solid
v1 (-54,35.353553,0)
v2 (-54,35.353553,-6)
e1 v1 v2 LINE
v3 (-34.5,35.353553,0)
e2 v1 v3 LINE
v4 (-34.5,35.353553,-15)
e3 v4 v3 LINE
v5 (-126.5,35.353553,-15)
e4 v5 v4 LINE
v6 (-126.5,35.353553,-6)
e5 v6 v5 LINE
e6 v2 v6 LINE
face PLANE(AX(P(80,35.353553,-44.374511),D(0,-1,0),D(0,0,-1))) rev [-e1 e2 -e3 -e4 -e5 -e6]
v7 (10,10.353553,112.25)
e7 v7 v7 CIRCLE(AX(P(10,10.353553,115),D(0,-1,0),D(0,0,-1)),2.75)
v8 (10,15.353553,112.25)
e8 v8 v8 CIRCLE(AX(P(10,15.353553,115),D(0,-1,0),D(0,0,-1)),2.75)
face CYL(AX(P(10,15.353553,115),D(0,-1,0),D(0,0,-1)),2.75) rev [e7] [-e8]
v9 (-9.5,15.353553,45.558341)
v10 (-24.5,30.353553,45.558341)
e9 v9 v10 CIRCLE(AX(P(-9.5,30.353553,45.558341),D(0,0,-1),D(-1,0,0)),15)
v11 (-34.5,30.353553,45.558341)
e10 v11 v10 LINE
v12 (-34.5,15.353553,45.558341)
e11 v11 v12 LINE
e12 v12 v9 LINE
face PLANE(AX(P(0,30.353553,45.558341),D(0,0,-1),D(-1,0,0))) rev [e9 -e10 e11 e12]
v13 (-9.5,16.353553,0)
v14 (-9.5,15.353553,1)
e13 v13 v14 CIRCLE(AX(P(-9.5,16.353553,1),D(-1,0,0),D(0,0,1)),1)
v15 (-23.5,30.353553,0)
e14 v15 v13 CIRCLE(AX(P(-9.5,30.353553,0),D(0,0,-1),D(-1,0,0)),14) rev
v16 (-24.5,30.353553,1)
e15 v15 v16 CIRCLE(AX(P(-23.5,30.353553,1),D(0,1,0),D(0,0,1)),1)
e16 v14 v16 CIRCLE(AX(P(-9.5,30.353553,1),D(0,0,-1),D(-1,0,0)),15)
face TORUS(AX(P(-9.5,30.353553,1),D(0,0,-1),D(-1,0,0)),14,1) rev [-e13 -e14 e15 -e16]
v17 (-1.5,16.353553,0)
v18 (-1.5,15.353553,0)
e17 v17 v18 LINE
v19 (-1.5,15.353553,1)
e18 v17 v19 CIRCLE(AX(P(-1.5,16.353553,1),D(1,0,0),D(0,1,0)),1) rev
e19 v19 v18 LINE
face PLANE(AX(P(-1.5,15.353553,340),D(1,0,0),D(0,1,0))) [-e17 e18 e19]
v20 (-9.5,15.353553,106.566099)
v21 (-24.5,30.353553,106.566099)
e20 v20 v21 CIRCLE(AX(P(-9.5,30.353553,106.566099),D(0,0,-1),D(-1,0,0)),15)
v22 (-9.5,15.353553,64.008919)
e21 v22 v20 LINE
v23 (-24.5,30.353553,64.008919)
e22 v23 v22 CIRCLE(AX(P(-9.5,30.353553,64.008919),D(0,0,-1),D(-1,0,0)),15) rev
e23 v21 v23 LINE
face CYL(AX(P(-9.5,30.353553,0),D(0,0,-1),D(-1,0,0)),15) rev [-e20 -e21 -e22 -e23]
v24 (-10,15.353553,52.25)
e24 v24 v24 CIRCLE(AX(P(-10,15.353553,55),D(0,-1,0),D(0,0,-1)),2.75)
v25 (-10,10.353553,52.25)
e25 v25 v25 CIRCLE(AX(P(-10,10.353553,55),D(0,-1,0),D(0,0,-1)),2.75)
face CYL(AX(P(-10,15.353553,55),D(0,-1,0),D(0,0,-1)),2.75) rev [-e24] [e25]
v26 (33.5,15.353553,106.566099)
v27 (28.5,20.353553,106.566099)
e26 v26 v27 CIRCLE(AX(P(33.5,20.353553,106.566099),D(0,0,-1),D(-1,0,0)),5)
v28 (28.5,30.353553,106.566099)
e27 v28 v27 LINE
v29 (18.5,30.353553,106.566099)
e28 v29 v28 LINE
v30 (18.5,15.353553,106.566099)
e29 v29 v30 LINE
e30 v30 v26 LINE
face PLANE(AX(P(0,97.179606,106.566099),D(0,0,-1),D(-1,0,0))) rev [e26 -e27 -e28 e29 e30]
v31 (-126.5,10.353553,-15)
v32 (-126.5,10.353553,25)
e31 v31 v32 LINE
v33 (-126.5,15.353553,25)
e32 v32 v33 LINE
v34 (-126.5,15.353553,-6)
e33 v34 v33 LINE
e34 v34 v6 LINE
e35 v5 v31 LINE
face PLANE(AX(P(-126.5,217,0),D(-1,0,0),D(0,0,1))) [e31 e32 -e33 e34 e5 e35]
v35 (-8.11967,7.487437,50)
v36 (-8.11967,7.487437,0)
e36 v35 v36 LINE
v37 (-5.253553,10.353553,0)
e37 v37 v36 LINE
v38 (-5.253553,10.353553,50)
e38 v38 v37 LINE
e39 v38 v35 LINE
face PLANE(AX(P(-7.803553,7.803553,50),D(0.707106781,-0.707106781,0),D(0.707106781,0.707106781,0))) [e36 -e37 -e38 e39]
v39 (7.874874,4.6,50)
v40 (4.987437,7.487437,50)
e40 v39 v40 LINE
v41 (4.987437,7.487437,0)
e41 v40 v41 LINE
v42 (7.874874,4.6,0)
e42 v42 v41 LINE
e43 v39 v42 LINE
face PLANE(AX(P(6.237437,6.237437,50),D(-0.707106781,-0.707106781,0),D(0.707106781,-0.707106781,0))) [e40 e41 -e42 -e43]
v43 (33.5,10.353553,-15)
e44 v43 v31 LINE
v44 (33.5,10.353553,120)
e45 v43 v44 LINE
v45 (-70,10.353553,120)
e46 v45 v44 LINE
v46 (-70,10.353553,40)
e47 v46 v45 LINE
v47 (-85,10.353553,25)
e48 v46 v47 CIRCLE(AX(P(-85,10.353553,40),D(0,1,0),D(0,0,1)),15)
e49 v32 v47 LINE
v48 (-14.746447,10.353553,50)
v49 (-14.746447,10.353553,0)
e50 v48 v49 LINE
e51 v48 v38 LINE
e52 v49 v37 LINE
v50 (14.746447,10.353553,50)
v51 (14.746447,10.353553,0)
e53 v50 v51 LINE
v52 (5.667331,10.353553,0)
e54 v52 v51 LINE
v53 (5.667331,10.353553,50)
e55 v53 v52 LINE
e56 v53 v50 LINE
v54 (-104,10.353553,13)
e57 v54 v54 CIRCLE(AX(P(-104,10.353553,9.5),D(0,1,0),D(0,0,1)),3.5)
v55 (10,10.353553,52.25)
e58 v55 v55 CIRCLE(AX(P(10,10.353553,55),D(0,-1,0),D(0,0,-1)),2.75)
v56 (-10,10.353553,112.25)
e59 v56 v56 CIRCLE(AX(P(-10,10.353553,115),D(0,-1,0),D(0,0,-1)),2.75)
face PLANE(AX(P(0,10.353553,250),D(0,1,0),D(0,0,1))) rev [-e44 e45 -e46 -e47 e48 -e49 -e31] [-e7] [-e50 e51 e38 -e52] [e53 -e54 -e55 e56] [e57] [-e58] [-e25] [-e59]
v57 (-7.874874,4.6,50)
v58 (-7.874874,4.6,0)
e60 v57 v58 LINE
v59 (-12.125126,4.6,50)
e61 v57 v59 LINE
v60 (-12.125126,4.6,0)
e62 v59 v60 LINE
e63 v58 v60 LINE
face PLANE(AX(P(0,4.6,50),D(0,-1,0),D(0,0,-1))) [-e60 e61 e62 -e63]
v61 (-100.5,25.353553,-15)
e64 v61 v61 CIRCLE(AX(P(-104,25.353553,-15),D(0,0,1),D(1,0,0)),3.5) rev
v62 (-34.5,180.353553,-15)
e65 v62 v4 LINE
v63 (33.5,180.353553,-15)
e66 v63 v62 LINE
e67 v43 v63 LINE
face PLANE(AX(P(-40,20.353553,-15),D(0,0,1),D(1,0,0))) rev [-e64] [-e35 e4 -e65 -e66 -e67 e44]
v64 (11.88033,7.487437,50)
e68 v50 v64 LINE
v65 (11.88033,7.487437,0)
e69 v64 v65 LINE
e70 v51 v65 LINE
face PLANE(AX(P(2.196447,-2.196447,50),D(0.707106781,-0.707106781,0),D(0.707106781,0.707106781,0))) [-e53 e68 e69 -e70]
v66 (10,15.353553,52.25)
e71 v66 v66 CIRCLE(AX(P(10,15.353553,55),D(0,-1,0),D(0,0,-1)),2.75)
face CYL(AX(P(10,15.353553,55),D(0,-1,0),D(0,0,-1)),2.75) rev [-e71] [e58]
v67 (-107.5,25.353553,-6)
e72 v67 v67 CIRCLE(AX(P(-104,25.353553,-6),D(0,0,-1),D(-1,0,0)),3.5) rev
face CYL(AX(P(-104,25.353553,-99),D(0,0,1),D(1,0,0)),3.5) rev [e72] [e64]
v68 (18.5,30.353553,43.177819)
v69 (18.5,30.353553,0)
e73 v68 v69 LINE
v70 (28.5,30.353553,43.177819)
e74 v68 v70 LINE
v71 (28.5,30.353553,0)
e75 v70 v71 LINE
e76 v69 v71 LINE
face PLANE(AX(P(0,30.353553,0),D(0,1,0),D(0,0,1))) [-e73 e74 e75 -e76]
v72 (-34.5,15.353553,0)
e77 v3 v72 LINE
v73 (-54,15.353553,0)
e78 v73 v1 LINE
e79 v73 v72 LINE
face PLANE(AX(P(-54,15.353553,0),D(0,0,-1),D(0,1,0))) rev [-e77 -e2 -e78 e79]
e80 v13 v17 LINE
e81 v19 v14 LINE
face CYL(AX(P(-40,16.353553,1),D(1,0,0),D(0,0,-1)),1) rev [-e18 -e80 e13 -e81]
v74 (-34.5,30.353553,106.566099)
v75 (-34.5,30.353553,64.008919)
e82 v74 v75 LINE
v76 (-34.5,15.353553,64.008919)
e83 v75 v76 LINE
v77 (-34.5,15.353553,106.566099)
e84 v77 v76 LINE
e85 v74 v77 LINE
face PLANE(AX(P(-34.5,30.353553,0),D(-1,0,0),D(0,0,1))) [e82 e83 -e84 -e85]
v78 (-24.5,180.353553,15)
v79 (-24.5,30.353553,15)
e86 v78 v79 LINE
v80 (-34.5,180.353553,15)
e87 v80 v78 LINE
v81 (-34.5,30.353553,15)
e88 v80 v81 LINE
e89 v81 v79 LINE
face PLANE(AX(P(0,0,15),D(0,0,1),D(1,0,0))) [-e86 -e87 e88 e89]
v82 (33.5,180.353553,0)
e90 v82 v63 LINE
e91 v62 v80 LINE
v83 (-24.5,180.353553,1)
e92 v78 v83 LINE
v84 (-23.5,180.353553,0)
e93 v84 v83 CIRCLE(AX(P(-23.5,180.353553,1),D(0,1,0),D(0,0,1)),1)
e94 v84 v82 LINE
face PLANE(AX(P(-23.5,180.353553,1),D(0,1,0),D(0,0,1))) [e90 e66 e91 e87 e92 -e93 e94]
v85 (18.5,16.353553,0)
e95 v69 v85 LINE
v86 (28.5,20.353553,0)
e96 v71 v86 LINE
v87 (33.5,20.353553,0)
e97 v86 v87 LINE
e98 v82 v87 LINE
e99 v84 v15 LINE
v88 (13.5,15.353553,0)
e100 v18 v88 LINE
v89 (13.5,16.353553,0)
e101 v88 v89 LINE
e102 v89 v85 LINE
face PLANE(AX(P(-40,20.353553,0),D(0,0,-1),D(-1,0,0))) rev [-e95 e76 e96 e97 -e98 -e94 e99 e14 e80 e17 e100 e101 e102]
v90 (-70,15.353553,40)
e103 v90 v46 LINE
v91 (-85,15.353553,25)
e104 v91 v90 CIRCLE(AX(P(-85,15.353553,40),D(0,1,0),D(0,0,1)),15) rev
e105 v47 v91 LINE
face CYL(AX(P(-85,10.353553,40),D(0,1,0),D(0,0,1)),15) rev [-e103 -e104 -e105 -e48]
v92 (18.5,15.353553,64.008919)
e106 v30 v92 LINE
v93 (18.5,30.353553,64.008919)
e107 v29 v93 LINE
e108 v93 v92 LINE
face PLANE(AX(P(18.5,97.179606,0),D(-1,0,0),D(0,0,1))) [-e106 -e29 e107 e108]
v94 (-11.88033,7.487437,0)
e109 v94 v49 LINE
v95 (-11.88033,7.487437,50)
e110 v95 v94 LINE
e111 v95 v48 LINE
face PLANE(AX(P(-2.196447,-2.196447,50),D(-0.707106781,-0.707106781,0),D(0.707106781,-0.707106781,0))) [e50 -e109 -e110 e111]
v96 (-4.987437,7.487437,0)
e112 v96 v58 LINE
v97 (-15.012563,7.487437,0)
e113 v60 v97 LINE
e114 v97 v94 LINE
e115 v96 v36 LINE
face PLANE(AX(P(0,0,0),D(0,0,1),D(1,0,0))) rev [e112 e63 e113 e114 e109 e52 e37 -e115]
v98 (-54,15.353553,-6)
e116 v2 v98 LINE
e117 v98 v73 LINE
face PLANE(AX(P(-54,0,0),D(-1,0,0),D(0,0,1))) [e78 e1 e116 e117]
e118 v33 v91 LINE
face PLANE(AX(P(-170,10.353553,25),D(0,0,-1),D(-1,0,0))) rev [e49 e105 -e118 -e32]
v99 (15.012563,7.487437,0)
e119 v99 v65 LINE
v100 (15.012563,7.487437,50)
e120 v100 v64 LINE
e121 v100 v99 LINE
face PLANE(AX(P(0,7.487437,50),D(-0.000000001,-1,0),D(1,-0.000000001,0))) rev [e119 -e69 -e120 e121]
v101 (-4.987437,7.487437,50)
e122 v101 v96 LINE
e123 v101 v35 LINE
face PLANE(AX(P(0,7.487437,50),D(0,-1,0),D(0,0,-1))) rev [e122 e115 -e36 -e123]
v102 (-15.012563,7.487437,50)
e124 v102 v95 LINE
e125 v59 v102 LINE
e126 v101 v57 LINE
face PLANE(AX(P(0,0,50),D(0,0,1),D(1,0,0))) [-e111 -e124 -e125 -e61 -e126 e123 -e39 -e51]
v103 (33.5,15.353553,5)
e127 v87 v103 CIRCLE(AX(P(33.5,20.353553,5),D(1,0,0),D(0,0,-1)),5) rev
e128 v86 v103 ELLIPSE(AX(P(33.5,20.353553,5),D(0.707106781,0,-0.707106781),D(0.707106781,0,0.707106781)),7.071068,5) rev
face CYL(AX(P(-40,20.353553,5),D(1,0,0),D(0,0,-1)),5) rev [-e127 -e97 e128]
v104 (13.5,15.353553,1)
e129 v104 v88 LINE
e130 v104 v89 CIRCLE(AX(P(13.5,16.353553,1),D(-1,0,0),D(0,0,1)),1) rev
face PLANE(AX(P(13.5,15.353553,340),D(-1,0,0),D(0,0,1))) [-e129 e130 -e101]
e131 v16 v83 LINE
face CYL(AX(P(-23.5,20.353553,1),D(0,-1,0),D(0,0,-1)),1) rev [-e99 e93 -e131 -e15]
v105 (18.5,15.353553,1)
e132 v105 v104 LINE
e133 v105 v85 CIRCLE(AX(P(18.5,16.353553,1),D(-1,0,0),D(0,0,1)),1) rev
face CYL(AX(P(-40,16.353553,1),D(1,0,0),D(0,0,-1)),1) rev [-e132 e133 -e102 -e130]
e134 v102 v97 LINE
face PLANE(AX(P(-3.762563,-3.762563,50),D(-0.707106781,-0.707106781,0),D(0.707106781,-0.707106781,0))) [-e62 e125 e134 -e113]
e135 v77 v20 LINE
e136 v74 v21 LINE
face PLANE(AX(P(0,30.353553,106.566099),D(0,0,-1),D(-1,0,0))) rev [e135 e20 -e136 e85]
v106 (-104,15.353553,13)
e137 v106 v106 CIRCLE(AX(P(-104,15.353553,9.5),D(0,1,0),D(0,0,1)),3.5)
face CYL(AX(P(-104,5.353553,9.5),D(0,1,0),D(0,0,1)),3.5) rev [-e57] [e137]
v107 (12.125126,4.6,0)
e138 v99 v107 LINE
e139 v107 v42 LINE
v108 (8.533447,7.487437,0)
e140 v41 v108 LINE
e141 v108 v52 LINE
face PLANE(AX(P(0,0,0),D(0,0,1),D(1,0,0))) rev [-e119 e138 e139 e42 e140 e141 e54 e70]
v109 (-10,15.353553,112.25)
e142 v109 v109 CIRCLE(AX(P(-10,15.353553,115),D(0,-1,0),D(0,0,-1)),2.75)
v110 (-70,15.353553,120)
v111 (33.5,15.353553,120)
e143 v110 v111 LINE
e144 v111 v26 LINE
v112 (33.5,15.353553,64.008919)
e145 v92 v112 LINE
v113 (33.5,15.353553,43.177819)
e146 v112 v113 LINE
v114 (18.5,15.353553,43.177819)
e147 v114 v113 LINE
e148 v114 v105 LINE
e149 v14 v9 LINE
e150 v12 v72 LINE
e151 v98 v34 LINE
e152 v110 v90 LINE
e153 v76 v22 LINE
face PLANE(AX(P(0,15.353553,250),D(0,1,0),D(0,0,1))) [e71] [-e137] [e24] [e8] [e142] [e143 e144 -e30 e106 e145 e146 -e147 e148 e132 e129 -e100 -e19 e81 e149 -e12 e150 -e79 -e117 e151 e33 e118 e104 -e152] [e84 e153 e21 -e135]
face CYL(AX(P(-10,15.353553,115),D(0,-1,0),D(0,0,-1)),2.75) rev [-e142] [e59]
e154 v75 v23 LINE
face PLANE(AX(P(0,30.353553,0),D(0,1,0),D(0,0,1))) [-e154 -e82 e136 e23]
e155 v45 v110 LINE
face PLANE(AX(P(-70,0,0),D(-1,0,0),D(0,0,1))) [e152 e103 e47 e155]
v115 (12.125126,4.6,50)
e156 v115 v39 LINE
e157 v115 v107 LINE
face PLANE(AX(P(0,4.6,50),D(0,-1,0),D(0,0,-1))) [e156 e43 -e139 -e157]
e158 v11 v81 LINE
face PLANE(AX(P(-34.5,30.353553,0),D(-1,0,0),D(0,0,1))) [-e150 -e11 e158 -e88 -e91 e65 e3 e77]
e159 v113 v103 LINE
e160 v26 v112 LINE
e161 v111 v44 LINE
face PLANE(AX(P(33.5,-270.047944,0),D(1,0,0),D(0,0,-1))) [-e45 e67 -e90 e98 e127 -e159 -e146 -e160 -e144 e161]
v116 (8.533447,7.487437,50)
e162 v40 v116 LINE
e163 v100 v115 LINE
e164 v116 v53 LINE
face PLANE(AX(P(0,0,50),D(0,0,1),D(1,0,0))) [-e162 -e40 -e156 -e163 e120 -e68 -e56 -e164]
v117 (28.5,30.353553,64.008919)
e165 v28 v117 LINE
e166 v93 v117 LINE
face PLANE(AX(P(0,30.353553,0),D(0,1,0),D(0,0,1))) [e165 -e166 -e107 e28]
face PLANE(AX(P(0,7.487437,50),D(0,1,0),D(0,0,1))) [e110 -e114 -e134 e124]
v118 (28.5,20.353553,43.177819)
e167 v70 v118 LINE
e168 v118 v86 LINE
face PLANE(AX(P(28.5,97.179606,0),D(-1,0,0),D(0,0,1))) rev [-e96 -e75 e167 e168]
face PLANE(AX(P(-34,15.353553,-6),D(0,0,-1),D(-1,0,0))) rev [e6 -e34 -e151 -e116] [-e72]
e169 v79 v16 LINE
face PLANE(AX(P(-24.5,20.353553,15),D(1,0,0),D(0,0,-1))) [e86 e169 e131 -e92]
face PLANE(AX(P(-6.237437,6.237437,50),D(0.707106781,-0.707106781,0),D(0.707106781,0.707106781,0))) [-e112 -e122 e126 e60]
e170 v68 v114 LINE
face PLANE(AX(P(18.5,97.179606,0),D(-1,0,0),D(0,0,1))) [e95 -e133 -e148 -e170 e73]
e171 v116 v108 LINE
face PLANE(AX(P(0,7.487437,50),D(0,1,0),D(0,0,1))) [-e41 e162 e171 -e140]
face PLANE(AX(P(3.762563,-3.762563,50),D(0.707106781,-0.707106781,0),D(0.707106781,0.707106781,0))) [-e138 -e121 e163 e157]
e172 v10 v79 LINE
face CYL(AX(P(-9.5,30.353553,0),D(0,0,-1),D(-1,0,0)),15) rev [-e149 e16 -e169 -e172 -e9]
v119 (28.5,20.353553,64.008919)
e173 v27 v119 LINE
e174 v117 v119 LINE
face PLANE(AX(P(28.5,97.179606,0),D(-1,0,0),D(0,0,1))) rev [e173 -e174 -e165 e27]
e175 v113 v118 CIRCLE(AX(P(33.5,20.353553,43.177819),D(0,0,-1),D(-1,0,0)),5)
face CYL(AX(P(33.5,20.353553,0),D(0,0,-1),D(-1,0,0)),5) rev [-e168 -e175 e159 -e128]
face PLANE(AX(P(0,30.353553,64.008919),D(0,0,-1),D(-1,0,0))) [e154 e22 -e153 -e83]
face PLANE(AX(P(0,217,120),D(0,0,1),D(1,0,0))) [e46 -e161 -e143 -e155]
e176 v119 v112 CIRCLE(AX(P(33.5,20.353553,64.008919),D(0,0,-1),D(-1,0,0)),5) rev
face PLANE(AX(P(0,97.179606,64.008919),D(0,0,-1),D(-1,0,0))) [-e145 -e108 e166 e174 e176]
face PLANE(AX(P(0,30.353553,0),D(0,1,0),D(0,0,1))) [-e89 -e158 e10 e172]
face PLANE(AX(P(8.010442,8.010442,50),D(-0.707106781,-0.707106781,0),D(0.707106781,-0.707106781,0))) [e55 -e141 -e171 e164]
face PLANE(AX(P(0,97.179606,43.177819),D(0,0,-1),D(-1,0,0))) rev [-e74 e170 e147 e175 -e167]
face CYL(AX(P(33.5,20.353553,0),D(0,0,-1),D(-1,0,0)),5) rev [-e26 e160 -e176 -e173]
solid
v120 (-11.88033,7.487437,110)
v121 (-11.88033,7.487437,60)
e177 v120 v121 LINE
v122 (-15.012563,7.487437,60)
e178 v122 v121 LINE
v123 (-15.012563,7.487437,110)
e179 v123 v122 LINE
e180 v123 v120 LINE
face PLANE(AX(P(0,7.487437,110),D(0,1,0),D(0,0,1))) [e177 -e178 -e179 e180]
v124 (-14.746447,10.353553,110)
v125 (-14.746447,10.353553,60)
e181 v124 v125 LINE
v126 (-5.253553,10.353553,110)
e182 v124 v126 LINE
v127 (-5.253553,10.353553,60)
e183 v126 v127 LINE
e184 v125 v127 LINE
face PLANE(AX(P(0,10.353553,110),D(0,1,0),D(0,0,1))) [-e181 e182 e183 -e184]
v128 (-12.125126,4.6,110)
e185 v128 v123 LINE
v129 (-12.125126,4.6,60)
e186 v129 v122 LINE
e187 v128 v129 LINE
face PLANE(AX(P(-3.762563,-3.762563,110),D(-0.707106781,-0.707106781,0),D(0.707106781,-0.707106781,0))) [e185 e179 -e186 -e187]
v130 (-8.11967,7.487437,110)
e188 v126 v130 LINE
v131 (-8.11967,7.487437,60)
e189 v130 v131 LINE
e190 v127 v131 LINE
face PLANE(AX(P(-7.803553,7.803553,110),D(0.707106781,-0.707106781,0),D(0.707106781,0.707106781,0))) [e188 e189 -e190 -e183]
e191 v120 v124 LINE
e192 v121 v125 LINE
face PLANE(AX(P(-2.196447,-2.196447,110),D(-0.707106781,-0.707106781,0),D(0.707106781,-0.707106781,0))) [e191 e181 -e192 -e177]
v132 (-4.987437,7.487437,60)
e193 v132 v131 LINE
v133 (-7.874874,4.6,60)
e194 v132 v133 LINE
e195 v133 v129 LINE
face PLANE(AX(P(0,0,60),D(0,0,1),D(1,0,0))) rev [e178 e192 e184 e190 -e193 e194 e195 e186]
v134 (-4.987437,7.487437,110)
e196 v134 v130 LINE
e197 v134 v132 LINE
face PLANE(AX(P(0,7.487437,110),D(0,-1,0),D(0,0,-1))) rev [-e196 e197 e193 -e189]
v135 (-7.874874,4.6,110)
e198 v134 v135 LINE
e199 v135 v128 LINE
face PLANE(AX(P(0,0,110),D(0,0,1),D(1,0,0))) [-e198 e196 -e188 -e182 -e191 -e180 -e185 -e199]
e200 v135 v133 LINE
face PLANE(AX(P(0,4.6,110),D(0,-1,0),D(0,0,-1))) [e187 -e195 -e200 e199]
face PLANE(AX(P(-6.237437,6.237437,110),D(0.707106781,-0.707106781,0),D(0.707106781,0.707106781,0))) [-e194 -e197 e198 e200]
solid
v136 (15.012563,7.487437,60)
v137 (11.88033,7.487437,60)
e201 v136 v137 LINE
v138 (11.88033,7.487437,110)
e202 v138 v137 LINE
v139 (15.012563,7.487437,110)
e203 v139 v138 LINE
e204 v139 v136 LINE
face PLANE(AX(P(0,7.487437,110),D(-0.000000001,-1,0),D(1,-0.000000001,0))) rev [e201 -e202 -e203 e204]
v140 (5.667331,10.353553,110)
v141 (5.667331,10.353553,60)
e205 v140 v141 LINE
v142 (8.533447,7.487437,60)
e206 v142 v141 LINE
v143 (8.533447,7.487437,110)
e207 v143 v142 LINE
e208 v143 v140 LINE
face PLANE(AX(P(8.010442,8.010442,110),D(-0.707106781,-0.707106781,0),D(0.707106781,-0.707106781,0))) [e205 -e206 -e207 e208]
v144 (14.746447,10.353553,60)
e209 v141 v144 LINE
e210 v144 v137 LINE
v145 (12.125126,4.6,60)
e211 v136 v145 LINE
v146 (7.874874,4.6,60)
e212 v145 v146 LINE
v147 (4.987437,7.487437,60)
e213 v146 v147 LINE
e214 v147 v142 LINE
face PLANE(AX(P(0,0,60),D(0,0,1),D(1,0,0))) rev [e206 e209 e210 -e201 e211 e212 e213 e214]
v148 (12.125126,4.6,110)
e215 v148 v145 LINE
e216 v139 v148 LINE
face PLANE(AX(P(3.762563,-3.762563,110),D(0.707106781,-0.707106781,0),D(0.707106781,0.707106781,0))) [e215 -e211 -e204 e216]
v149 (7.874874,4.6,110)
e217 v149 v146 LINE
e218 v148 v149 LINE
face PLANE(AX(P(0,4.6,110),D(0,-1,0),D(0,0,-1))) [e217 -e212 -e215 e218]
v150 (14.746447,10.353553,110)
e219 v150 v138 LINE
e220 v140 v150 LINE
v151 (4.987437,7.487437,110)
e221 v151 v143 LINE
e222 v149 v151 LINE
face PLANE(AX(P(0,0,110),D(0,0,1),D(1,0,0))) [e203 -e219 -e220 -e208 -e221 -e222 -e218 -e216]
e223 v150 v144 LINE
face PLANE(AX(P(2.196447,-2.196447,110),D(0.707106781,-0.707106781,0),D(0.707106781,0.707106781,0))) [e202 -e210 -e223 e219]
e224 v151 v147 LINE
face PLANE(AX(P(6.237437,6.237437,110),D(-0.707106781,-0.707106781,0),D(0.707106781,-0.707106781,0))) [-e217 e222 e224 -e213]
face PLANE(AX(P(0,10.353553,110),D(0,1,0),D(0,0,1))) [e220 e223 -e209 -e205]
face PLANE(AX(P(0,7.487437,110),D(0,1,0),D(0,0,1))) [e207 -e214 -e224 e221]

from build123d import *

# Parameters (mm, degrees)
BOSS_EXTRUDE1_DEPTH      = 250
BOSS_EXTRUDE2_DEPTH      = 50
BOSS_EXTRUDE2_2_DEPTH    = 50
LPATTERN1_COUNT          = 4
LPATTERN1_PITCH          = 60
SKETCH2_R                = 2.75
CUT_EXTRUDE1_DEPTH       = 251.864711302
UPPER_ACRYLIC_SUPP_W     = 20
UPPER_ACRYLIC_SUPP_H     = 250
BOSS_EXTRUDE3_DEPTH      = 5
UPPER_ACRYLIC_SUPP_3_W   = 10
UPPER_ACRYLIC_SUPP_3_H   = 66.073604859
UPPER_ACRYLIC_SUPP_3_H_2 = 41.475217291
UPPER_ACRYLIC_SUPP_3_H_3 = 42.557179481
UPPER_ACRYLIC_SUPP_3_H_4 = 45.558340935
BOSS_EXTRUDE4_DEPTH      = 15
FILLET1_R                = 15
SKETCH4_W                = 60
SKETCH4_H                = 15
BOSS_EXTRUDE5_DEPTH      = 5
SKETCH4_3_W              = 60
SKETCH4_3_H              = 15
BOSS_EXTRUDE6_DEPTH      = 60
SKETCH5_W                = 10
SKETCH5_H                = 45
BOSS_EXTRUDE7_DEPTH      = 15
BOSS_EXTRUDE8_START      = 250
SKETCH5_3_W              = 10
SKETCH5_3_H              = 45
BOSS_EXTRUDE8_DEPTH      = 15
FILLET2_R                = 1
SKETCH6_W                = 6
SKETCH6_H                = 60
CUT_EXTRUDE2_DEPTH       = 6
BOSS_EXTRUDE9_DEPTH      = 30
SKETCH8_W                = 333.602701612
SKETCH8_H                = 59.031331047
CUT_EXTRUDE3_DEPTH       = 150
SKETCH9_W                = 6
SKETCH9_H                = 20
CLOTH_ESCAPE_GAP_DEPTH   = 20
SKETCH11_W               = 9
SKETCH11_H               = 20
BOSS_EXTRUDE11_DEPTH     = 100
CUT_EXTRUDE4_DEPTH       = 68
SKETCH13_W               = 40
SKETCH13_H               = 5
BOSS_EXTRUDE13_DEPTH     = 100
CUT_EXTRUDE5_DEPTH       = 100
FILLET3_R                = 15
BOSS_EXTRUDE14_START     = -5
BOSS_EXTRUDE14_DEPTH     = 25
CUT_EXTRUDE6_DEPTH       = 30
CUT_EXTRUDE6_DEPTH_BACK  = 10
SKETCH16_5_W             = 8.5
SKETCH16_5_H             = 41.475217291
SKETCH16_5_H_2           = 42.557179481
SKETCH16_5_W_2           = 1.5
SKETCH16_5_H_3           = 42.177819043
SKETCH16_5_H_4           = 20.831100018
SKETCH16_5_H_5           = 17.311395043
SKETCH16_5_H_6           = 18.573684265
SKETCH16_5_H_7           = 65.073604859
SKETCH16_6_W             = 8.5
SKETCH16_6_H             = 41.475217291
SKETCH16_6_H_2           = 42.557179481
SKETCH16_6_W_2           = 1.5
SKETCH16_6_H_3           = 42.177819043
SKETCH16_6_H_4           = 20.831100018
SKETCH16_6_H_5           = 17.311395043
SKETCH16_6_H_6           = 18.573684265
SKETCH16_6_H_7           = 65.073604859
BOSS_EXTRUDE15_DEPTH     = 5
BOSS_EXTRUDE16_DEPTH     = 20
SKETCH16_8_W             = 8.5
SKETCH16_8_H             = 41.475217291
SKETCH16_8_H_2           = 42.557179481
SKETCH16_8_W_2           = 1.5
SKETCH16_8_H_3           = 42.177819043
SKETCH16_8_H_4           = 65.073604859
BOSS_EXTRUDE17_DEPTH     = 15
BOSS_EXTRUDE18_START     = -5
BOSS_EXTRUDE18_DEPTH     = 25
FILLET4_R                = 5
BOSS_EXTRUDE21_START     = 145
BOSS_EXTRUDE21_DEPTH     = 170
SKETCH19_R               = 3.5
CUT_EXTRUDE7_DEPTH       = 10
CUT_EXTRUDE8_DEPTH       = 355
CUT_EXTRUDE8_DEPTH_BACK  = 10
SKETCH20_R               = 3.5
SKETCH21_W               = 15
SKETCH21_H               = 197.501027769
CUT_EXTRUDE9_DEPTH       = 340
SKETCH22_W               = 160
SKETCH22_H               = 135
SKETCH22_H_2             = 10
CUT_EXTRUDE10_DEPTH      = 217


with BuildPart() as part:
    # profile → Boss-Extrude1 (new body)
    with BuildSketch(Plane.XY):
        Polygon((-14.746446609, 10.353553391), (-5.253553391, 10.353553391), (5.667330529, 10.353553391), (14.746446609, 10.353553391), (20, 10.353553391), (20, 15.353553391), (-20, 15.353553391), (-20, 10.353553391), align=None)
    extrude(amount=BOSS_EXTRUDE1_DEPTH)

    # Sketch2 → Cut-Extrude1 (cut, through all)
    with BuildSketch(Plane.XZ.offset(-10.353553391)):
        with Locations(Location((-10, 175, 0), (0, 0, 270))):
            Circle(SKETCH2_R)
        with Locations(Location((10, 175, 0), (0, 0, 270))):
            Circle(SKETCH2_R)
        with Locations(Location((-10, 115, 0), (0, 0, 270))):
            Circle(SKETCH2_R)
        with Locations(Location((10, 115, 0), (0, 0, 270))):
            Circle(SKETCH2_R)
        with Locations(Location((-10, 55, 0), (0, 0, 270))):
            Circle(SKETCH2_R)
        with Locations(Location((10, 55, 0), (0, 0, 270))):
            Circle(SKETCH2_R)
    extrude(amount=-CUT_EXTRUDE1_DEPTH, mode=Mode.SUBTRACT)

    # upper_acrylic_supp → Boss-Extrude3 (add)
    with BuildSketch(Plane(origin=(0, 15.353553391, 0), x_dir=(1, 0, 0), z_dir=(0, 1, 0))):
        with Locations((-30, -125)):
            Rectangle(UPPER_ACRYLIC_SUPP_W, UPPER_ACRYLIC_SUPP_H)
    extrude(amount=-BOSS_EXTRUDE3_DEPTH)

    # upper_acrylic_supp<3> → Boss-Extrude4 (add)
    with BuildSketch(Plane(origin=(0, 15.353553391, 0), x_dir=(1, 0, 0), z_dir=(0, 1, 0))):
        with Locations((-29.5, -216.963197571)):
            Rectangle(UPPER_ACRYLIC_SUPP_3_W, UPPER_ACRYLIC_SUPP_3_H)
        with Locations((-29.5, -144.615102231)):
            Rectangle(UPPER_ACRYLIC_SUPP_3_W, UPPER_ACRYLIC_SUPP_3_H_2)
        with Locations((-29.5, -85.287508801)):
            Rectangle(UPPER_ACRYLIC_SUPP_3_W, UPPER_ACRYLIC_SUPP_3_H_3)
        with Locations((-29.5, -22.779170468)):
            Rectangle(UPPER_ACRYLIC_SUPP_3_W, UPPER_ACRYLIC_SUPP_3_H_4)
    extrude(amount=BOSS_EXTRUDE4_DEPTH)

    # Fillet1
    fillet1_edges = [part.edges().sort_by_distance(p)[0] for p in [
        (-24.5, 15.353553391, 22.779170467),
        (-24.5, 15.353553391, 85.287508801),
        (-24.5, 15.353553391, 144.615102231),
        (-24.5, 15.353553391, 216.963197571),
    ]]
    fillet(fillet1_edges, radius=FILLET1_R - 0.0001)  # a hair under: the kernel refuses the full size



with BuildPart() as body_2:
    # Sketch1<3> → Boss-Extrude2 (new body)
    with BuildSketch(Plane.XY):
        Polygon((-7.253553391, 8.353553391), (-8.119669914, 7.487436867), (-5.5, 7.487436867), (-4.987436867, 7.487436867), (-5.5, 6.974873734), (-7.874873734, 4.6), (-12.125126266, 4.6), (-14.5, 6.974873734), (-15.012563133, 7.487436867), (-14.5, 7.487436867), (-11.880330086, 7.487436867), (-12.746446609, 8.353553391), (-14.746446609, 10.353553391), (-5.253553391, 10.353553391), align=None)
    boss_extrude2 = extrude(amount=BOSS_EXTRUDE2_DEPTH)


with BuildPart() as body_3:
    # Sketch1<3> → Boss-Extrude2 2 (new body)
    with BuildSketch(Plane.XY):
        Polygon((12.746446609, 8.353553391), (11.880330086, 7.487436867), (14.5, 7.487436867), (15.012563133, 7.487436867), (14.5, 6.974873734), (12.125126266, 4.6), (7.874873734, 4.6), (5.5, 6.974873734), (4.987436867, 7.487436867), (5.5, 7.487436867), (8.533447053, 7.487436867), (7.667330529, 8.353553391), (5.667330529, 10.353553391), (14.746446609, 10.353553391), align=None)
    boss_extrude2_2 = extrude(amount=BOSS_EXTRUDE2_2_DEPTH)


with BuildPart() as lpattern1_1:
    # LPattern1: pattern copy
    add(boss_extrude2.moved(Location(Vector(0, 0, 1) * (1 * LPATTERN1_PITCH))))


with BuildPart() as lpattern1_2:
    # LPattern1: pattern copy
    add(boss_extrude2.moved(Location(Vector(0, 0, 1) * (2 * LPATTERN1_PITCH))))


with BuildPart() as lpattern1_3:
    # LPattern1: pattern copy
    add(boss_extrude2.moved(Location(Vector(0, 0, 1) * (3 * LPATTERN1_PITCH))))


with BuildPart() as lpattern1_4:
    # LPattern1: pattern copy
    add(boss_extrude2_2.moved(Location(Vector(0, 0, 1) * (1 * LPATTERN1_PITCH))))


with BuildPart() as lpattern1_5:
    # LPattern1: pattern copy
    add(boss_extrude2_2.moved(Location(Vector(0, 0, 1) * (2 * LPATTERN1_PITCH))))


with BuildPart() as lpattern1_6:
    # LPattern1: pattern copy
    add(boss_extrude2_2.moved(Location(Vector(0, 0, 1) * (3 * LPATTERN1_PITCH))))


with BuildPart() as part_1:
    add(part.part)

    add(body_2.part)  # Boss-Extrude5 merges body 2

    add(body_3.part)  # Boss-Extrude5 merges body 3
    # Sketch4 → Boss-Extrude5 (add, symmetric)
    with BuildSketch(Plane(origin=(0, 15.353553391, 0), x_dir=(1, 0, 0), z_dir=(0, 1, 0))):
        with Locations((-10, -257.5)):
            Rectangle(SKETCH4_W, SKETCH4_H)
        with Locations((-10, 7.5)):
            Rectangle(SKETCH4_W, SKETCH4_H)
    extrude(amount=BOSS_EXTRUDE5_DEPTH, both=True)

    # Sketch4<3> → Boss-Extrude6 (add)
    with BuildSketch(Plane(origin=(0, 15.353553391, 0), x_dir=(1, 0, 0), z_dir=(0, 1, 0))):
        with Locations((-10, -257.5)):
            Rectangle(SKETCH4_3_W, SKETCH4_3_H)
        with Locations((-10, 7.5)):
            Rectangle(SKETCH4_3_W, SKETCH4_3_H)
    extrude(amount=BOSS_EXTRUDE6_DEPTH)

    # Sketch5 → Boss-Extrude7 (add)
    with BuildSketch(Plane(origin=(0, 0, 250), x_dir=(-1, 0, 0), z_dir=(0, 0, -1))):
        with Locations((29.5, 52.853553391)):
            Rectangle(SKETCH5_W, SKETCH5_H)
    extrude(amount=BOSS_EXTRUDE7_DEPTH)

    # Sketch5<3> → Boss-Extrude8 (add)
    with BuildSketch(Plane(origin=(0, 0, 250), x_dir=(-1, 0, 0), z_dir=(0, 0, -1)).offset(BOSS_EXTRUDE8_START)):
        with Locations((29.5, 52.853553391)):
            Rectangle(SKETCH5_3_W, SKETCH5_3_H)
    extrude(amount=-BOSS_EXTRUDE8_DEPTH)

    # Fillet2
    fillet2_edges = [part_1.edges().sort_by_distance(p)[0] for p in [
        (-24.5, 52.853503391, 250),
        (-24.5, 52.853503391, 0),
        (5.24995, 15.353553391, 250),
        (-20.106631007, 19.746922384, 250),
        (-20.106631007, 19.746922384, 0),
        (5.24995, 15.353553391, 0),
    ]]
    fillet(fillet2_edges, radius=FILLET2_R)

    # Sketch6 → Cut-Extrude2 (cut)
    with BuildSketch(Plane.ZY.offset(40)):
        with Locations((253, 45.353553391)):
            Rectangle(SKETCH6_W, SKETCH6_H)
        with Locations((-3, 45.353553391)):
            Rectangle(SKETCH6_W, SKETCH6_H)
    extrude(amount=-CUT_EXTRUDE2_DEPTH, mode=Mode.SUBTRACT)

    # Sketch7 → Boss-Extrude9 (add)
    with BuildSketch(Plane.ZY.offset(40)):
        Polygon((265, 75.353553391), (256, 75.353553391), (256, 15.353553391), (-6, 15.353553391), (-6, 75.353553391), (-15, 75.353553391), (-15, 10.353553391), (265, 10.353553391), align=None)
    extrude(amount=BOSS_EXTRUDE9_DEPTH)

    # Sketch8 → Cut-Extrude3 (cut)
    with BuildSketch(Plane.ZY.offset(70)):
        with Locations((122.426839416, 64.869218915)):
            Rectangle(SKETCH8_W, SKETCH8_H)
    extrude(amount=-CUT_EXTRUDE3_DEPTH, mode=Mode.SUBTRACT)

    # Sketch9 → cloth_escape_gap (add)
    with BuildSketch(Plane.ZY.offset(34)):
        with Locations((253, 25.353553391)):
            Rectangle(SKETCH9_W, SKETCH9_H)
        with Locations((-3, 25.353553391)):
            Rectangle(SKETCH9_W, SKETCH9_H)
    extrude(amount=CLOTH_ESCAPE_GAP_DEPTH)

    # Sketch11 → Boss-Extrude11 (add)
    with BuildSketch(Plane.ZY.offset(70)):
        with Locations((-10.5, 25.353553391)):
            Rectangle(SKETCH11_W, SKETCH11_H)
        with Locations((260.5, 25.353553391)):
            Rectangle(SKETCH11_W, SKETCH11_H)
    extrude(amount=BOSS_EXTRUDE11_DEPTH)

    # Sketch12 → Cut-Extrude4 (cut)
    with BuildSketch(Plane.XZ.offset(-10.353553391)):
        Polygon((-170, 265), (-70, 265), (-170, 260.5), align=None)
        Polygon((-70, -15), (-170, -10.5), (-170, -15), align=None)
    extrude(amount=-CUT_EXTRUDE4_DEPTH, mode=Mode.SUBTRACT)

    # Sketch13 → Boss-Extrude13 (add)
    with BuildSketch(Plane.ZY.offset(70)):
        with Locations((5, 12.853553391)):
            Rectangle(SKETCH13_W, SKETCH13_H)
        with Locations((245, 12.853553391)):
            Rectangle(SKETCH13_W, SKETCH13_H)
    extrude(amount=BOSS_EXTRUDE13_DEPTH)

    # Sketch14 → Cut-Extrude5 (cut)
    with BuildSketch(Plane(origin=(0, 15.353553391, 0), x_dir=(1, 0, 0), z_dir=(0, 1, 0))):
        Polygon((-70, -265), (-170, -260.5), (-170, -265), align=None)
        Polygon((-170, 15), (-170, 10.5), (-70, 15), align=None)
    extrude(amount=-CUT_EXTRUDE5_DEPTH, mode=Mode.SUBTRACT)

    # Fillet3
    fillet3_edges = [part_1.edges().sort_by_distance(p)[0] for p in [
        (-70, 12.853553391, 25),
        (-70, 12.853553391, 225),
    ]]
    fillet(fillet3_edges, radius=FILLET3_R)

    # Sketch16 → Boss-Extrude14 (add)
    with BuildSketch(Plane(origin=(0, 15.353553391, 0), x_dir=(1, 0, 0), z_dir=(0, 1, 0)).offset(BOSS_EXTRUDE14_START)):
        Polygon((28.5, 0), (33.5, 0), (33.5, 15), (18.5, 15), (18.5, 0), align=None)
        Polygon((18.5, -250), (18.5, -265), (33.5, -265), (33.5, -250), (28.5, -250), align=None)
    extrude(amount=BOSS_EXTRUDE14_DEPTH)

    # Sketch16<5> → Cut-Extrude6 (cut, two sides: drawn at the far end of the back side and taken through both)
    with BuildSketch(Plane(origin=(0, 15.353553391, 0), x_dir=(1, 0, 0), z_dir=(0, 1, 0)).offset(-CUT_EXTRUDE6_DEPTH_BACK)):
        Polygon((18.5, -250), (18.5, -265), (33.5, -265), (33.5, -250), (28.5, -250), align=None)
        Polygon((28.5, -250), (33.5, -250), (33.5, 0), (28.5, 0), (28.5, -43.177819043), (20, -43.177819043), (20, -64.008919061), (28.5, -64.008919061), (28.5, -106.566098542), (20, -106.566098542), (20, -123.877493585), (28.5, -123.877493585), (28.5, -165.352710876), (20, -165.352710876), (20, -183.926395141), (28.5, -183.926395141), align=None)
        with Locations((24.25, -144.615102231)):
            Rectangle(SKETCH16_5_W, SKETCH16_5_H)
        with Locations((24.25, -85.287508801)):
            Rectangle(SKETCH16_5_W, SKETCH16_5_H_2)
        Polygon((28.5, -43.177819043), (28.5, 0), (18.5, 0), (18.5, -1), (20, -1), (20, -43.177819043), align=None)
        Polygon((28.5, 0), (33.5, 0), (33.5, 15), (18.5, 15), (18.5, 0), align=None)
        with Locations((19.25, -22.088909521)):
            Rectangle(SKETCH16_5_W_2, SKETCH16_5_H_3)
        with Locations((19.25, -53.593369052)):
            Rectangle(SKETCH16_5_W_2, SKETCH16_5_H_4)
        with Locations((19.25, -85.287508801)):
            Rectangle(SKETCH16_5_W_2, SKETCH16_5_H_2)
        with Locations((19.25, -115.221796064)):
            Rectangle(SKETCH16_5_W_2, SKETCH16_5_H_5)
        with Locations((19.25, -144.615102231)):
            Rectangle(SKETCH16_5_W_2, SKETCH16_5_H)
        with Locations((19.25, -174.639553009)):
            Rectangle(SKETCH16_5_W_2, SKETCH16_5_H_6)
        with Locations((19.25, -216.463197571)):
            Rectangle(SKETCH16_5_W_2, SKETCH16_5_H_7)
        Polygon((18.5, -249), (18.5, -250), (28.5, -250), (28.5, -183.926395141), (20, -183.926395141), (20, -249), align=None)
    extrude(amount=CUT_EXTRUDE6_DEPTH + CUT_EXTRUDE6_DEPTH_BACK, mode=Mode.SUBTRACT)

    # Sketch16<6> → Boss-Extrude15 (add)
    with BuildSketch(Plane(origin=(0, 15.353553391, 0), x_dir=(1, 0, 0), z_dir=(0, 1, 0))):
        Polygon((28.5, -250), (33.5, -250), (33.5, 0), (28.5, 0), (28.5, -43.177819043), (20, -43.177819043), (20, -64.008919061), (28.5, -64.008919061), (28.5, -106.566098542), (20, -106.566098542), (20, -123.877493585), (28.5, -123.877493585), (28.5, -165.352710876), (20, -165.352710876), (20, -183.926395141), (28.5, -183.926395141), align=None)
        Polygon((18.5, -249), (18.5, -250), (28.5, -250), (28.5, -183.926395141), (20, -183.926395141), (20, -249), align=None)
        Polygon((18.5, -250), (18.5, -265), (33.5, -265), (33.5, -250), (28.5, -250), align=None)
        with Locations((24.25, -144.615102231)):
            Rectangle(SKETCH16_6_W, SKETCH16_6_H)
        with Locations((24.25, -85.287508801)):
            Rectangle(SKETCH16_6_W, SKETCH16_6_H_2)
        Polygon((28.5, -43.177819043), (28.5, 0), (18.5, 0), (18.5, -1), (20, -1), (20, -43.177819043), align=None)
        Polygon((28.5, 0), (33.5, 0), (33.5, 15), (18.5, 15), (18.5, 0), align=None)
        with Locations((19.25, -22.088909521)):
            Rectangle(SKETCH16_6_W_2, SKETCH16_6_H_3)
        with Locations((19.25, -53.593369052)):
            Rectangle(SKETCH16_6_W_2, SKETCH16_6_H_4)
        with Locations((19.25, -85.287508801)):
            Rectangle(SKETCH16_6_W_2, SKETCH16_6_H_2)
        with Locations((19.25, -115.221796064)):
            Rectangle(SKETCH16_6_W_2, SKETCH16_6_H_5)
        with Locations((19.25, -144.615102231)):
            Rectangle(SKETCH16_6_W_2, SKETCH16_6_H)
        with Locations((19.25, -174.639553009)):
            Rectangle(SKETCH16_6_W_2, SKETCH16_6_H_6)
        with Locations((19.25, -216.463197571)):
            Rectangle(SKETCH16_6_W_2, SKETCH16_6_H_7)
    extrude(amount=-BOSS_EXTRUDE15_DEPTH)

    # Sketch16<7> → Boss-Extrude16 (add)
    with BuildSketch(Plane(origin=(0, 15.353553391, 0), x_dir=(1, 0, 0), z_dir=(0, 1, 0))):
        Polygon((18.5, -250), (18.5, -265), (33.5, -265), (33.5, -250), (28.5, -250), align=None)
        Polygon((28.5, 0), (33.5, 0), (33.5, 15), (18.5, 15), (18.5, 0), align=None)
    extrude(amount=BOSS_EXTRUDE16_DEPTH)

    # Sketch16<8> → Boss-Extrude17 (add)
    with BuildSketch(Plane(origin=(0, 15.353553391, 0), x_dir=(1, 0, 0), z_dir=(0, 1, 0))):
        Polygon((18.5, -249), (18.5, -250), (28.5, -250), (28.5, -183.926395141), (20, -183.926395141), (20, -249), align=None)
        with Locations((24.25, -144.615102231)):
            Rectangle(SKETCH16_8_W, SKETCH16_8_H)
        with Locations((24.25, -85.287508801)):
            Rectangle(SKETCH16_8_W, SKETCH16_8_H_2)
        Polygon((28.5, -43.177819043), (28.5, 0), (18.5, 0), (18.5, -1), (20, -1), (20, -43.177819043), align=None)
        with Locations((19.25, -22.088909521)):
            Rectangle(SKETCH16_8_W_2, SKETCH16_8_H_3)
        with Locations((19.25, -85.287508801)):
            Rectangle(SKETCH16_8_W_2, SKETCH16_8_H_2)
        with Locations((19.25, -144.615102231)):
            Rectangle(SKETCH16_8_W_2, SKETCH16_8_H)
        with Locations((19.25, -216.463197571)):
            Rectangle(SKETCH16_8_W_2, SKETCH16_8_H_4)
    extrude(amount=BOSS_EXTRUDE17_DEPTH)

    # Sketch14<2> → Boss-Extrude18 (add)
    with BuildSketch(Plane(origin=(0, 15.353553391, 0), x_dir=(1, 0, 0), z_dir=(0, 1, 0)).offset(BOSS_EXTRUDE18_START)):
        Polygon((-70, -265), (-170, -260.5), (-170, -265), align=None)
        Polygon((-170, 15), (-170, 10.5), (-70, 15), align=None)
    extrude(amount=BOSS_EXTRUDE18_DEPTH)

    # Fillet4
    fillet4_edges = [part_1.edges().sort_by_distance(p)[0] for p in [
        (31, 15.353553391, 0),
        (28.5, 15.353553391, 21.588909521),
        (28.5, 15.353553391, 85.287508801),
        (28.5, 15.353553391, 144.615102231),
        (31, 15.353553391, 250),
        (28.5, 15.353553391, 216.963197571),
    ]]
    fillet(fillet4_edges, radius=FILLET4_R - 0.0001)  # a hair under: the kernel refuses the full size

    # Sketch18 → Boss-Extrude21 (add)
    with BuildSketch(Plane(origin=(0, 35.353553391, 0), x_dir=(1, 0, 0), z_dir=(0, 1, 0)).offset(BOSS_EXTRUDE21_START)):
        with BuildLine():
            Line((-34.5, -250), (-34.5, -265))
            Line((-34.5, -265), (33.5, -265))
            Line((33.5, -265), (33.5, -250))
            Line((33.5, -250), (-23.5, -250))
            ThreePointArc((-23.5, -250), (-24.207106781, -249.707106781), (-24.5, -249))
            Line((-24.5, -249), (-24.5, -235))
            Line((-24.5, -235), (-34.5, -235))
            Line((-34.5, -235), (-34.5, -250))
        make_face()
        with BuildLine():
            Line((-34.5, 15), (-34.5, 0))
            Line((-34.5, 0), (-34.5, -15))
            Line((-34.5, -15), (-24.5, -15))
            Line((-24.5, -15), (-24.5, -1))
            ThreePointArc((-24.5, -1), (-24.207106781, -0.292893219), (-23.5, 0))
            Line((-23.5, 0), (33.5, 0))
            Line((33.5, 0), (33.5, 15))
            Line((33.5, 15), (-34.5, 15))
        make_face()
    extrude(amount=-BOSS_EXTRUDE21_DEPTH)

    # Sketch19 → Cut-Extrude7 (cut)
    with BuildSketch(Plane(origin=(0, 15.353553391, 0), x_dir=(1, 0, 0), z_dir=(0, 1, 0))):
        with Locations(Location((-154, -9.5, 0), (0, 0, 270))):
            Circle(SKETCH19_R)
        with Locations(Location((-104, -9.5, 0), (0, 0, 270))):
            Circle(SKETCH19_R)
        with Locations(Location((-104, -240.5, 0), (0, 0, 270))):
            Circle(SKETCH19_R)
        with Locations(Location((-154, -240.5, 0), (0, 0, 270))):
            Circle(SKETCH19_R)
    extrude(amount=-CUT_EXTRUDE7_DEPTH, mode=Mode.SUBTRACT)

    # Sketch20 → Cut-Extrude8 (cut, two sides: drawn at the far end of the back side and taken through both)
    with BuildSketch(Plane(origin=(0, 0, 256), x_dir=(-1, 0, 0), z_dir=(0, 0, -1)).offset(-CUT_EXTRUDE8_DEPTH_BACK)):
        with Locations(Location((104, 25.353553391, 0), (0, 0, 180))):
            Circle(SKETCH20_R)
        with Locations(Location((154, 25.353553391, 0), (0, 0, 180))):
            Circle(SKETCH20_R)
    extrude(amount=CUT_EXTRUDE8_DEPTH + CUT_EXTRUDE8_DEPTH_BACK, mode=Mode.SUBTRACT)

    # Sketch21 → Cut-Extrude9 (cut)
    with BuildSketch(Plane.XY):
        with Locations((6, 114.104067276)):
            Rectangle(SKETCH21_W, SKETCH21_H)
    extrude(amount=CUT_EXTRUDE9_DEPTH, mode=Mode.SUBTRACT)


with BuildPart() as cut_extrude10_tool:
    # Sketch22 → Cut-Extrude10 (new body)
    with BuildSketch(Plane(origin=(0, 0, 0), x_dir=(1, 0, 0), z_dir=(0, 1, 0))):
        Polygon((-126.5, 15), (-186.5, 15), (-186.5, -265), (-126.5, -265), (-126.5, -130), (-126.5, -120), align=None)
        with Locations((-46.5, -197.5)):
            Rectangle(SKETCH22_W, SKETCH22_H)
        with Locations((-46.5, -125)):
            Rectangle(SKETCH22_W, SKETCH22_H_2)
    extrude(amount=CUT_EXTRUDE10_DEPTH)


with BuildPart() as part_2:
    add(part_1.part)

    # Cut-Extrude10: cut by cut_extrude10_tool
    add(cut_extrude10_tool.part, mode=Mode.SUBTRACT)


with BuildPart() as lpattern1_2_1:
    add(lpattern1_2.part)

    # Cut-Extrude10: cut by cut_extrude10_tool
    add(cut_extrude10_tool.part, mode=Mode.SUBTRACT)


with BuildPart() as lpattern1_3_1:
    add(lpattern1_3.part)

    # Cut-Extrude10: cut by cut_extrude10_tool
    add(cut_extrude10_tool.part, mode=Mode.SUBTRACT)


with BuildPart() as lpattern1_5_1:
    add(lpattern1_5.part)

    # Cut-Extrude10: cut by cut_extrude10_tool
    add(cut_extrude10_tool.part, mode=Mode.SUBTRACT)


with BuildPart() as lpattern1_6_1:
    add(lpattern1_6.part)

    # Cut-Extrude10: cut by cut_extrude10_tool
    add(cut_extrude10_tool.part, mode=Mode.SUBTRACT)


solid = Compound([lpattern1_1.part, lpattern1_4.part, part_2.part])
